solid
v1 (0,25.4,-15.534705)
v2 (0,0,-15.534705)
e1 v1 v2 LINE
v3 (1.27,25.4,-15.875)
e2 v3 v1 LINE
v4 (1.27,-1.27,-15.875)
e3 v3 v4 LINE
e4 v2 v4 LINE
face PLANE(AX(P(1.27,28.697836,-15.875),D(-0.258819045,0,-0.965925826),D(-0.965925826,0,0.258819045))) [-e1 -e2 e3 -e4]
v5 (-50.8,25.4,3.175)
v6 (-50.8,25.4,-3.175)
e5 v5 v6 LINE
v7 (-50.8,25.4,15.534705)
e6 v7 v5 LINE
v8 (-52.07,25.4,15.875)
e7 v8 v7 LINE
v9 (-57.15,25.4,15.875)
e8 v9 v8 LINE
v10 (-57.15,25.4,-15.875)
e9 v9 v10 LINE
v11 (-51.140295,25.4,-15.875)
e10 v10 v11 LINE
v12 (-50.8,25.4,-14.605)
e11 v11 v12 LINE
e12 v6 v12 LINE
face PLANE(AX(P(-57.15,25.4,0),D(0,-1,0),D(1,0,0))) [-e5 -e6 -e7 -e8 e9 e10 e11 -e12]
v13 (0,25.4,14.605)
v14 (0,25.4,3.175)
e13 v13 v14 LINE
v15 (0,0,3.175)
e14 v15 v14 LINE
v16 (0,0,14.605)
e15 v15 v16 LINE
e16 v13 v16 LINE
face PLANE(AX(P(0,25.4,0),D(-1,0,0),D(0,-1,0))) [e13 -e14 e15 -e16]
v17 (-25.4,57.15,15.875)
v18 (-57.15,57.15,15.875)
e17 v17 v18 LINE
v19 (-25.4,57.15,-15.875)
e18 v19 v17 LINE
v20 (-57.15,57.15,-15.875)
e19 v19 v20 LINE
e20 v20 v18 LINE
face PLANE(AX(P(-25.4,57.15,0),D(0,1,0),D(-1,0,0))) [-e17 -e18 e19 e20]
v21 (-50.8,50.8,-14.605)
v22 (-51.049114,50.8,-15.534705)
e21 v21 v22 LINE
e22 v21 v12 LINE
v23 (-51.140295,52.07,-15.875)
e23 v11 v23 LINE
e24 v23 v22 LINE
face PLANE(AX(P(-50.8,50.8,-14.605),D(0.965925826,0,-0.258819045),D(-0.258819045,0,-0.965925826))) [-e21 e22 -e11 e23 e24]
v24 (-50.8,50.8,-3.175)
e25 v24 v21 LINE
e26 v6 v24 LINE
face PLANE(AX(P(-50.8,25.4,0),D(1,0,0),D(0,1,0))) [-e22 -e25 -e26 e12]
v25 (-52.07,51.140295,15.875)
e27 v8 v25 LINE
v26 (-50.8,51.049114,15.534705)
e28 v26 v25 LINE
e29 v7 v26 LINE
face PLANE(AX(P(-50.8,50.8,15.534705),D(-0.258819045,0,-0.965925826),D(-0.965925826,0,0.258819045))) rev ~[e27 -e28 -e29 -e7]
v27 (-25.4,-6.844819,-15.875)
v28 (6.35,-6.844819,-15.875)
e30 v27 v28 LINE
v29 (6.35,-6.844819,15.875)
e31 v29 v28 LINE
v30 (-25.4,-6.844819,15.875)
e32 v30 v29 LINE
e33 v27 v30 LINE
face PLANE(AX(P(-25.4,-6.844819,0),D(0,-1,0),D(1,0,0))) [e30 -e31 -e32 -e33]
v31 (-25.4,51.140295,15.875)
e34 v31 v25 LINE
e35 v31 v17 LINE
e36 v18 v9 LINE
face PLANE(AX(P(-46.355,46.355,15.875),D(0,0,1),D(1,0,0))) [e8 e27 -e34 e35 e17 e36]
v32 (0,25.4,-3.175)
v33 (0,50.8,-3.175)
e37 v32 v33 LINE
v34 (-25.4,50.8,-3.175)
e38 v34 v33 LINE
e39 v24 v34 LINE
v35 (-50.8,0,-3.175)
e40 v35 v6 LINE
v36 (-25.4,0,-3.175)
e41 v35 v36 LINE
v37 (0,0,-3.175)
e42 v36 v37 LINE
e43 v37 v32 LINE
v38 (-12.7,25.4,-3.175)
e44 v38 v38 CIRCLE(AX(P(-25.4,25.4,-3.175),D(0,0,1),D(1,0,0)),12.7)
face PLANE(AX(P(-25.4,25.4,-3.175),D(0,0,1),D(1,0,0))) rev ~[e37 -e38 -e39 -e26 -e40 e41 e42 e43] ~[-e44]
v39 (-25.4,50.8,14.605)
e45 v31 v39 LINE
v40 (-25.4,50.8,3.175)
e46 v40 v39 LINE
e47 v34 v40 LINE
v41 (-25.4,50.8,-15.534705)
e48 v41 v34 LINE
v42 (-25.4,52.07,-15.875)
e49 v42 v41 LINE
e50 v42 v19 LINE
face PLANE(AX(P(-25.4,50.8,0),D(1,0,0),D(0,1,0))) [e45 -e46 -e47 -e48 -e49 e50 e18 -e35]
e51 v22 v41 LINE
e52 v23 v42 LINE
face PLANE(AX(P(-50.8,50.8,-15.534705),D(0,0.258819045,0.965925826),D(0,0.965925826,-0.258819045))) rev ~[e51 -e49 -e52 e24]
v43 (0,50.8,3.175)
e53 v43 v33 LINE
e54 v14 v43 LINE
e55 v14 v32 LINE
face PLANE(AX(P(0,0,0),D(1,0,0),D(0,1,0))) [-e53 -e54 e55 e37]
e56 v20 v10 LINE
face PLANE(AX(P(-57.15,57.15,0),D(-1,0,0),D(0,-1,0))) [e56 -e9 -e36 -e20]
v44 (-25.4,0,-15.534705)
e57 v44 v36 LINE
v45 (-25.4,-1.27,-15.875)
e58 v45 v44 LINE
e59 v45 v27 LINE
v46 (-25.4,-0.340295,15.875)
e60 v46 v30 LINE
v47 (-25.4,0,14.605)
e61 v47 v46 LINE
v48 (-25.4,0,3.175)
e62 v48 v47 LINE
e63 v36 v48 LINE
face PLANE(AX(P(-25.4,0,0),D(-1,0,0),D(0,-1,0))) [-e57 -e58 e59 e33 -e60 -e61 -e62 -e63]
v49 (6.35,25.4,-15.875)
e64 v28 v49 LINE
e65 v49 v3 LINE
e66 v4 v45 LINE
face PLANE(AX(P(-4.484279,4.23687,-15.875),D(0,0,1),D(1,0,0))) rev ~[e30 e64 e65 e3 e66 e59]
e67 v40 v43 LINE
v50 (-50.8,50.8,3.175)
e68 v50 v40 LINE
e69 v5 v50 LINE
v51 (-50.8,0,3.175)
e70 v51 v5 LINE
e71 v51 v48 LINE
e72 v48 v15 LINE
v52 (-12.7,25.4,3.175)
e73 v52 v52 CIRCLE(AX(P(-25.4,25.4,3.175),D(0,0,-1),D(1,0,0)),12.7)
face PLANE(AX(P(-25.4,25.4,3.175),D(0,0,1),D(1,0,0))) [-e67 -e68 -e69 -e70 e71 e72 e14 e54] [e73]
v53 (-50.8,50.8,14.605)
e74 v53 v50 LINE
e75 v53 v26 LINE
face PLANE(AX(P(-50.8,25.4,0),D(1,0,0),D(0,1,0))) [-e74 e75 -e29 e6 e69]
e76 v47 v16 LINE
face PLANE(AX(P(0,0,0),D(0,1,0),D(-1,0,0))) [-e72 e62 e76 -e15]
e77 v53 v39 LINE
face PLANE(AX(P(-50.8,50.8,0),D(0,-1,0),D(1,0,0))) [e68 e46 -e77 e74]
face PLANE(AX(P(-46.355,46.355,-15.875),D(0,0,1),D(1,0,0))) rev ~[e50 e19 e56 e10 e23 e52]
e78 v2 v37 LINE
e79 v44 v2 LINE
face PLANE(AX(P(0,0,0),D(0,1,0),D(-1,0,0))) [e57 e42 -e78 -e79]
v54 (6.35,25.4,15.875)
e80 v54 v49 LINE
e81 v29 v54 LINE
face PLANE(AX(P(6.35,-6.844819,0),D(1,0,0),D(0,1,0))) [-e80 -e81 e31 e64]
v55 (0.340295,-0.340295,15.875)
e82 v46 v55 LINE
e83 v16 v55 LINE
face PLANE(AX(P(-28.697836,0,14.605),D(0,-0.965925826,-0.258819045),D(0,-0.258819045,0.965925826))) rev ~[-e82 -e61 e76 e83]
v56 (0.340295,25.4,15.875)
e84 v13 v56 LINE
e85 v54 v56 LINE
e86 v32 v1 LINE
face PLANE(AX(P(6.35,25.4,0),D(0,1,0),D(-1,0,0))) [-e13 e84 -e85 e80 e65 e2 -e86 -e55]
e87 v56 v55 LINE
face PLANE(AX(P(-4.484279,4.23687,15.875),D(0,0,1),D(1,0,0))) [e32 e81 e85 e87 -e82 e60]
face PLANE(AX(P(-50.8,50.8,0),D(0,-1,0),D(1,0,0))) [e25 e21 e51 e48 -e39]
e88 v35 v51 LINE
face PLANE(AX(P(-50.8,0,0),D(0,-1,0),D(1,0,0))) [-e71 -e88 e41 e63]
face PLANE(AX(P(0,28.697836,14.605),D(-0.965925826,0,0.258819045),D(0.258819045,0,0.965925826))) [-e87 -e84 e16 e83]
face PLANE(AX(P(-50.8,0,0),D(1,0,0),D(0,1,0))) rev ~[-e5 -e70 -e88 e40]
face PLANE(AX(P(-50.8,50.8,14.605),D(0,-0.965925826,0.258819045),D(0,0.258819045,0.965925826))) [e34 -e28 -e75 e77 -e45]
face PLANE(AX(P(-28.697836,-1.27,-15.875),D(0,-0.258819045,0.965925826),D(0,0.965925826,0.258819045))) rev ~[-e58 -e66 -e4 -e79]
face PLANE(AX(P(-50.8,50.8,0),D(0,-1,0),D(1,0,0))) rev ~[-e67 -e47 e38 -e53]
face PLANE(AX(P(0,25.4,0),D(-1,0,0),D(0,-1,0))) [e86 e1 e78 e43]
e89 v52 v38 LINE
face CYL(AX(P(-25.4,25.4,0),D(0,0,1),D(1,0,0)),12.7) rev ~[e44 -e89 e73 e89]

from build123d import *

# Parameters (mm, degrees)
F0_W          = 50.8
F0_H          = 50.8
F3_DEPTH      = 3.175
F4_DEPTH      = 15.875
F5_DEPTH      = 15.875
F6_T1_DEPTH   = 28.6978363942
F6_T3_DEPTH   = 28.6978363942
F6_T5_DEPTH   = 28.6978363942
F6_T7_DEPTH   = 28.6978363942
F6_T13_DEPTH  = 31.9956727883
F6_T17_DEPTH  = 31.9956727883
F6_T24_DEPTH  = 31.9956727883
F6_T28_DEPTH  = 31.9956727883
F6_T35_DEPTH  = 31.9956727883
F6_T39_DEPTH  = 31.9956727883
F6_T46_DEPTH  = 31.9956727883
F6_T50_DEPTH  = 31.9956727883
F7_R          = 12.7
F8_DEPTH      = 15.876
F8_DEPTH_BACK = 15.876


# Not quite as in the source:
# - a fillet or chamfer that OpenCascade refuses, or shapes differently, is made with other operations: its cross-section is extruded or revolved along the edge and cut away or added


with BuildPart() as f3:
    # F0 (on Top) → F3 (new body, symmetric)
    with BuildSketch(Plane.XY):
        with Locations((-25.4, 25.4)):
            Rectangle(F0_W, F0_H)
    extrude(amount=F3_DEPTH, both=True)

    # F1 (on Top) → F4 (join, symmetric)
    with BuildSketch(Plane.XY):
        Polygon((0, 25.4), (0, 0), (-25.4, 0), (-25.4, -6.8448194891), (6.35, -6.8448194891), (6.35, 25.4), align=None)
    extrude(amount=F4_DEPTH, both=True)

    # F2 (on Top) → F5 (join, symmetric)
    with BuildSketch(Plane.XY):
        Polygon((-50.8, 50.8), (-25.4, 50.8), (-25.4, 57.15), (-57.15, 57.15), (-57.15, 25.4), (-50.8, 25.4), align=None)
    extrude(amount=F5_DEPTH, both=True)

    # F6: chamfer of 1.27 x 0.3402954744 on 8 edges, made by hand

    # F6_s2 → F6_t1 (cut)
    with BuildSketch(Plane.YZ.offset(-28.6978363942)):
        Polygon((0, 14.605), (-0.3402954744, 15.875), (0, 15.875), align=None)
        Polygon((-1.27, -15.875), (0, -15.5347045256), (0, -15.875), align=None)
    extrude(amount=F6_T1_DEPTH, mode=Mode.SUBTRACT)

    # F6_s4 → F6_t3 (cut)
    with BuildSketch(Plane.XZ.offset(-28.6978363942)):
        Polygon((0, 14.605), (0.3402954744, 15.875), (0, 15.875), align=None)
        Polygon((1.27, -15.875), (0, -15.5347045256), (0, -15.875), align=None)
    extrude(amount=F6_T3_DEPTH, mode=Mode.SUBTRACT)

    # F6_s6 → F6_t5 (cut)
    with BuildSketch(Plane.YZ.offset(-50.8)):
        Polygon((50.8, 14.605), (51.1402954744, 15.875), (50.8, 15.875), align=None)
        Polygon((50.8, -15.5347045256), (52.07, -15.875), (50.8, -15.875), align=None)
    extrude(amount=F6_T5_DEPTH, mode=Mode.SUBTRACT)

    # F6_s8 → F6_t7 (cut)
    with BuildSketch(Plane.XZ.offset(-50.8)):
        Polygon((-50.8, 15.5347045256), (-52.07, 15.875), (-50.8, 15.875), align=None)
        Polygon((-50.8, -14.605), (-51.1402954744, -15.875), (-50.8, -15.875), align=None)
    extrude(amount=F6_T7_DEPTH, mode=Mode.SUBTRACT)


with BuildPart() as f6_tool11:
    # F6_s12 → F6_t13 (new body)
    with BuildSketch(Plane.YZ.offset(3.2978363942)):
        Polygon((0, 14.605), (-0.3402954744, 15.875), (0, 15.875), align=None)
    extrude(amount=-F6_T13_DEPTH)

    split(bisect_by=Plane.YZ, keep=Keep.TOP)


with BuildPart() as f6_tool15:
    # F6_s16 → F6_t17 (new body)
    with BuildSketch(Plane.XZ.offset(-28.6978363942)):
        Polygon((0, 14.605), (0.3402954744, 15.875), (0, 15.875), align=None)
    extrude(amount=F6_T17_DEPTH)

    split(bisect_by=Plane.XZ, keep=Keep.TOP)


with BuildPart() as f6_tool11_1:
    add(f6_tool11.part)

    # F6_t19: intersect F6_tool15
    add(f6_tool15.part, mode=Mode.INTERSECT)


with BuildPart() as f3_1:
    add(f3.part)

    # F6_t9: cut F6_tool11
    add(f6_tool11_1.part, mode=Mode.SUBTRACT)


with BuildPart() as f6_tool22:
    # F6_s23 → F6_t24 (new body)
    with BuildSketch(Plane.YZ.offset(-54.0978363942)):
        Polygon((50.8, 14.605), (51.1402954744, 15.875), (50.8, 15.875), align=None)
    extrude(amount=F6_T24_DEPTH)

    split(bisect_by=Plane.YZ.offset(-50.8), keep=Keep.BOTTOM)


with BuildPart() as f6_tool26:
    # F6_s27 → F6_t28 (new body)
    with BuildSketch(Plane.XZ.offset(-22.1021636058)):
        Polygon((-50.8, 15.5347045256), (-52.07, 15.875), (-50.8, 15.875), align=None)
    extrude(amount=-F6_T28_DEPTH)

    split(bisect_by=Plane.XZ.offset(-50.8), keep=Keep.BOTTOM)


with BuildPart() as f6_tool22_1:
    add(f6_tool22.part)

    # F6_t30: intersect F6_tool26
    add(f6_tool26.part, mode=Mode.INTERSECT)


with BuildPart() as f3_2:
    add(f3_1.part)

    # F6_t20: cut F6_tool22
    add(f6_tool22_1.part, mode=Mode.SUBTRACT)


with BuildPart() as f6_tool33:
    # F6_s34 → F6_t35 (new body)
    with BuildSketch(Plane.XZ.offset(-28.6978363942)):
        Polygon((1.27, -15.875), (0, -15.5347045256), (0, -15.875), align=None)
    extrude(amount=F6_T35_DEPTH)

    split(bisect_by=Plane.XZ, keep=Keep.TOP)


with BuildPart() as f6_tool37:
    # F6_s38 → F6_t39 (new body)
    with BuildSketch(Plane.YZ.offset(3.2978363942)):
        Polygon((-1.27, -15.875), (0, -15.5347045256), (0, -15.875), align=None)
    extrude(amount=-F6_T39_DEPTH)

    split(bisect_by=Plane.YZ, keep=Keep.TOP)


with BuildPart() as f6_tool33_1:
    add(f6_tool33.part)

    # F6_t41: intersect F6_tool37
    add(f6_tool37.part, mode=Mode.INTERSECT)


with BuildPart() as f3_3:
    add(f3_2.part)

    # F6_t31: cut F6_tool33
    add(f6_tool33_1.part, mode=Mode.SUBTRACT)


with BuildPart() as f6_tool44:
    # F6_s45 → F6_t46 (new body)
    with BuildSketch(Plane.YZ.offset(-54.0978363942)):
        Polygon((50.8, -15.5347045256), (52.07, -15.875), (50.8, -15.875), align=None)
    extrude(amount=F6_T46_DEPTH)

    split(bisect_by=Plane.YZ.offset(-50.8), keep=Keep.BOTTOM)


with BuildPart() as f6_tool48:
    # F6_s49 → F6_t50 (new body)
    with BuildSketch(Plane.XZ.offset(-22.1021636058)):
        Polygon((-50.8, -14.605), (-51.1402954744, -15.875), (-50.8, -15.875), align=None)
    extrude(amount=-F6_T50_DEPTH)

    split(bisect_by=Plane.XZ.offset(-50.8), keep=Keep.BOTTOM)


with BuildPart() as f6_tool44_1:
    add(f6_tool44.part)

    # F6_t52: intersect F6_tool48
    add(f6_tool48.part, mode=Mode.INTERSECT)


with BuildPart() as f3_4:
    add(f3_3.part)

    # F6_t42: cut F6_tool44
    add(f6_tool44_1.part, mode=Mode.SUBTRACT)

    # F7 (on Top) → F8 (cut, two sides)
    with BuildSketch(Plane.XY) as f8_sk:
        with Locations((-25.4, 25.4)):
            Circle(F7_R)
    extrude(amount=-F8_DEPTH, mode=Mode.SUBTRACT)
    extrude(f8_sk.sketch, amount=F8_DEPTH_BACK, mode=Mode.SUBTRACT)


solid = f3_4.part
